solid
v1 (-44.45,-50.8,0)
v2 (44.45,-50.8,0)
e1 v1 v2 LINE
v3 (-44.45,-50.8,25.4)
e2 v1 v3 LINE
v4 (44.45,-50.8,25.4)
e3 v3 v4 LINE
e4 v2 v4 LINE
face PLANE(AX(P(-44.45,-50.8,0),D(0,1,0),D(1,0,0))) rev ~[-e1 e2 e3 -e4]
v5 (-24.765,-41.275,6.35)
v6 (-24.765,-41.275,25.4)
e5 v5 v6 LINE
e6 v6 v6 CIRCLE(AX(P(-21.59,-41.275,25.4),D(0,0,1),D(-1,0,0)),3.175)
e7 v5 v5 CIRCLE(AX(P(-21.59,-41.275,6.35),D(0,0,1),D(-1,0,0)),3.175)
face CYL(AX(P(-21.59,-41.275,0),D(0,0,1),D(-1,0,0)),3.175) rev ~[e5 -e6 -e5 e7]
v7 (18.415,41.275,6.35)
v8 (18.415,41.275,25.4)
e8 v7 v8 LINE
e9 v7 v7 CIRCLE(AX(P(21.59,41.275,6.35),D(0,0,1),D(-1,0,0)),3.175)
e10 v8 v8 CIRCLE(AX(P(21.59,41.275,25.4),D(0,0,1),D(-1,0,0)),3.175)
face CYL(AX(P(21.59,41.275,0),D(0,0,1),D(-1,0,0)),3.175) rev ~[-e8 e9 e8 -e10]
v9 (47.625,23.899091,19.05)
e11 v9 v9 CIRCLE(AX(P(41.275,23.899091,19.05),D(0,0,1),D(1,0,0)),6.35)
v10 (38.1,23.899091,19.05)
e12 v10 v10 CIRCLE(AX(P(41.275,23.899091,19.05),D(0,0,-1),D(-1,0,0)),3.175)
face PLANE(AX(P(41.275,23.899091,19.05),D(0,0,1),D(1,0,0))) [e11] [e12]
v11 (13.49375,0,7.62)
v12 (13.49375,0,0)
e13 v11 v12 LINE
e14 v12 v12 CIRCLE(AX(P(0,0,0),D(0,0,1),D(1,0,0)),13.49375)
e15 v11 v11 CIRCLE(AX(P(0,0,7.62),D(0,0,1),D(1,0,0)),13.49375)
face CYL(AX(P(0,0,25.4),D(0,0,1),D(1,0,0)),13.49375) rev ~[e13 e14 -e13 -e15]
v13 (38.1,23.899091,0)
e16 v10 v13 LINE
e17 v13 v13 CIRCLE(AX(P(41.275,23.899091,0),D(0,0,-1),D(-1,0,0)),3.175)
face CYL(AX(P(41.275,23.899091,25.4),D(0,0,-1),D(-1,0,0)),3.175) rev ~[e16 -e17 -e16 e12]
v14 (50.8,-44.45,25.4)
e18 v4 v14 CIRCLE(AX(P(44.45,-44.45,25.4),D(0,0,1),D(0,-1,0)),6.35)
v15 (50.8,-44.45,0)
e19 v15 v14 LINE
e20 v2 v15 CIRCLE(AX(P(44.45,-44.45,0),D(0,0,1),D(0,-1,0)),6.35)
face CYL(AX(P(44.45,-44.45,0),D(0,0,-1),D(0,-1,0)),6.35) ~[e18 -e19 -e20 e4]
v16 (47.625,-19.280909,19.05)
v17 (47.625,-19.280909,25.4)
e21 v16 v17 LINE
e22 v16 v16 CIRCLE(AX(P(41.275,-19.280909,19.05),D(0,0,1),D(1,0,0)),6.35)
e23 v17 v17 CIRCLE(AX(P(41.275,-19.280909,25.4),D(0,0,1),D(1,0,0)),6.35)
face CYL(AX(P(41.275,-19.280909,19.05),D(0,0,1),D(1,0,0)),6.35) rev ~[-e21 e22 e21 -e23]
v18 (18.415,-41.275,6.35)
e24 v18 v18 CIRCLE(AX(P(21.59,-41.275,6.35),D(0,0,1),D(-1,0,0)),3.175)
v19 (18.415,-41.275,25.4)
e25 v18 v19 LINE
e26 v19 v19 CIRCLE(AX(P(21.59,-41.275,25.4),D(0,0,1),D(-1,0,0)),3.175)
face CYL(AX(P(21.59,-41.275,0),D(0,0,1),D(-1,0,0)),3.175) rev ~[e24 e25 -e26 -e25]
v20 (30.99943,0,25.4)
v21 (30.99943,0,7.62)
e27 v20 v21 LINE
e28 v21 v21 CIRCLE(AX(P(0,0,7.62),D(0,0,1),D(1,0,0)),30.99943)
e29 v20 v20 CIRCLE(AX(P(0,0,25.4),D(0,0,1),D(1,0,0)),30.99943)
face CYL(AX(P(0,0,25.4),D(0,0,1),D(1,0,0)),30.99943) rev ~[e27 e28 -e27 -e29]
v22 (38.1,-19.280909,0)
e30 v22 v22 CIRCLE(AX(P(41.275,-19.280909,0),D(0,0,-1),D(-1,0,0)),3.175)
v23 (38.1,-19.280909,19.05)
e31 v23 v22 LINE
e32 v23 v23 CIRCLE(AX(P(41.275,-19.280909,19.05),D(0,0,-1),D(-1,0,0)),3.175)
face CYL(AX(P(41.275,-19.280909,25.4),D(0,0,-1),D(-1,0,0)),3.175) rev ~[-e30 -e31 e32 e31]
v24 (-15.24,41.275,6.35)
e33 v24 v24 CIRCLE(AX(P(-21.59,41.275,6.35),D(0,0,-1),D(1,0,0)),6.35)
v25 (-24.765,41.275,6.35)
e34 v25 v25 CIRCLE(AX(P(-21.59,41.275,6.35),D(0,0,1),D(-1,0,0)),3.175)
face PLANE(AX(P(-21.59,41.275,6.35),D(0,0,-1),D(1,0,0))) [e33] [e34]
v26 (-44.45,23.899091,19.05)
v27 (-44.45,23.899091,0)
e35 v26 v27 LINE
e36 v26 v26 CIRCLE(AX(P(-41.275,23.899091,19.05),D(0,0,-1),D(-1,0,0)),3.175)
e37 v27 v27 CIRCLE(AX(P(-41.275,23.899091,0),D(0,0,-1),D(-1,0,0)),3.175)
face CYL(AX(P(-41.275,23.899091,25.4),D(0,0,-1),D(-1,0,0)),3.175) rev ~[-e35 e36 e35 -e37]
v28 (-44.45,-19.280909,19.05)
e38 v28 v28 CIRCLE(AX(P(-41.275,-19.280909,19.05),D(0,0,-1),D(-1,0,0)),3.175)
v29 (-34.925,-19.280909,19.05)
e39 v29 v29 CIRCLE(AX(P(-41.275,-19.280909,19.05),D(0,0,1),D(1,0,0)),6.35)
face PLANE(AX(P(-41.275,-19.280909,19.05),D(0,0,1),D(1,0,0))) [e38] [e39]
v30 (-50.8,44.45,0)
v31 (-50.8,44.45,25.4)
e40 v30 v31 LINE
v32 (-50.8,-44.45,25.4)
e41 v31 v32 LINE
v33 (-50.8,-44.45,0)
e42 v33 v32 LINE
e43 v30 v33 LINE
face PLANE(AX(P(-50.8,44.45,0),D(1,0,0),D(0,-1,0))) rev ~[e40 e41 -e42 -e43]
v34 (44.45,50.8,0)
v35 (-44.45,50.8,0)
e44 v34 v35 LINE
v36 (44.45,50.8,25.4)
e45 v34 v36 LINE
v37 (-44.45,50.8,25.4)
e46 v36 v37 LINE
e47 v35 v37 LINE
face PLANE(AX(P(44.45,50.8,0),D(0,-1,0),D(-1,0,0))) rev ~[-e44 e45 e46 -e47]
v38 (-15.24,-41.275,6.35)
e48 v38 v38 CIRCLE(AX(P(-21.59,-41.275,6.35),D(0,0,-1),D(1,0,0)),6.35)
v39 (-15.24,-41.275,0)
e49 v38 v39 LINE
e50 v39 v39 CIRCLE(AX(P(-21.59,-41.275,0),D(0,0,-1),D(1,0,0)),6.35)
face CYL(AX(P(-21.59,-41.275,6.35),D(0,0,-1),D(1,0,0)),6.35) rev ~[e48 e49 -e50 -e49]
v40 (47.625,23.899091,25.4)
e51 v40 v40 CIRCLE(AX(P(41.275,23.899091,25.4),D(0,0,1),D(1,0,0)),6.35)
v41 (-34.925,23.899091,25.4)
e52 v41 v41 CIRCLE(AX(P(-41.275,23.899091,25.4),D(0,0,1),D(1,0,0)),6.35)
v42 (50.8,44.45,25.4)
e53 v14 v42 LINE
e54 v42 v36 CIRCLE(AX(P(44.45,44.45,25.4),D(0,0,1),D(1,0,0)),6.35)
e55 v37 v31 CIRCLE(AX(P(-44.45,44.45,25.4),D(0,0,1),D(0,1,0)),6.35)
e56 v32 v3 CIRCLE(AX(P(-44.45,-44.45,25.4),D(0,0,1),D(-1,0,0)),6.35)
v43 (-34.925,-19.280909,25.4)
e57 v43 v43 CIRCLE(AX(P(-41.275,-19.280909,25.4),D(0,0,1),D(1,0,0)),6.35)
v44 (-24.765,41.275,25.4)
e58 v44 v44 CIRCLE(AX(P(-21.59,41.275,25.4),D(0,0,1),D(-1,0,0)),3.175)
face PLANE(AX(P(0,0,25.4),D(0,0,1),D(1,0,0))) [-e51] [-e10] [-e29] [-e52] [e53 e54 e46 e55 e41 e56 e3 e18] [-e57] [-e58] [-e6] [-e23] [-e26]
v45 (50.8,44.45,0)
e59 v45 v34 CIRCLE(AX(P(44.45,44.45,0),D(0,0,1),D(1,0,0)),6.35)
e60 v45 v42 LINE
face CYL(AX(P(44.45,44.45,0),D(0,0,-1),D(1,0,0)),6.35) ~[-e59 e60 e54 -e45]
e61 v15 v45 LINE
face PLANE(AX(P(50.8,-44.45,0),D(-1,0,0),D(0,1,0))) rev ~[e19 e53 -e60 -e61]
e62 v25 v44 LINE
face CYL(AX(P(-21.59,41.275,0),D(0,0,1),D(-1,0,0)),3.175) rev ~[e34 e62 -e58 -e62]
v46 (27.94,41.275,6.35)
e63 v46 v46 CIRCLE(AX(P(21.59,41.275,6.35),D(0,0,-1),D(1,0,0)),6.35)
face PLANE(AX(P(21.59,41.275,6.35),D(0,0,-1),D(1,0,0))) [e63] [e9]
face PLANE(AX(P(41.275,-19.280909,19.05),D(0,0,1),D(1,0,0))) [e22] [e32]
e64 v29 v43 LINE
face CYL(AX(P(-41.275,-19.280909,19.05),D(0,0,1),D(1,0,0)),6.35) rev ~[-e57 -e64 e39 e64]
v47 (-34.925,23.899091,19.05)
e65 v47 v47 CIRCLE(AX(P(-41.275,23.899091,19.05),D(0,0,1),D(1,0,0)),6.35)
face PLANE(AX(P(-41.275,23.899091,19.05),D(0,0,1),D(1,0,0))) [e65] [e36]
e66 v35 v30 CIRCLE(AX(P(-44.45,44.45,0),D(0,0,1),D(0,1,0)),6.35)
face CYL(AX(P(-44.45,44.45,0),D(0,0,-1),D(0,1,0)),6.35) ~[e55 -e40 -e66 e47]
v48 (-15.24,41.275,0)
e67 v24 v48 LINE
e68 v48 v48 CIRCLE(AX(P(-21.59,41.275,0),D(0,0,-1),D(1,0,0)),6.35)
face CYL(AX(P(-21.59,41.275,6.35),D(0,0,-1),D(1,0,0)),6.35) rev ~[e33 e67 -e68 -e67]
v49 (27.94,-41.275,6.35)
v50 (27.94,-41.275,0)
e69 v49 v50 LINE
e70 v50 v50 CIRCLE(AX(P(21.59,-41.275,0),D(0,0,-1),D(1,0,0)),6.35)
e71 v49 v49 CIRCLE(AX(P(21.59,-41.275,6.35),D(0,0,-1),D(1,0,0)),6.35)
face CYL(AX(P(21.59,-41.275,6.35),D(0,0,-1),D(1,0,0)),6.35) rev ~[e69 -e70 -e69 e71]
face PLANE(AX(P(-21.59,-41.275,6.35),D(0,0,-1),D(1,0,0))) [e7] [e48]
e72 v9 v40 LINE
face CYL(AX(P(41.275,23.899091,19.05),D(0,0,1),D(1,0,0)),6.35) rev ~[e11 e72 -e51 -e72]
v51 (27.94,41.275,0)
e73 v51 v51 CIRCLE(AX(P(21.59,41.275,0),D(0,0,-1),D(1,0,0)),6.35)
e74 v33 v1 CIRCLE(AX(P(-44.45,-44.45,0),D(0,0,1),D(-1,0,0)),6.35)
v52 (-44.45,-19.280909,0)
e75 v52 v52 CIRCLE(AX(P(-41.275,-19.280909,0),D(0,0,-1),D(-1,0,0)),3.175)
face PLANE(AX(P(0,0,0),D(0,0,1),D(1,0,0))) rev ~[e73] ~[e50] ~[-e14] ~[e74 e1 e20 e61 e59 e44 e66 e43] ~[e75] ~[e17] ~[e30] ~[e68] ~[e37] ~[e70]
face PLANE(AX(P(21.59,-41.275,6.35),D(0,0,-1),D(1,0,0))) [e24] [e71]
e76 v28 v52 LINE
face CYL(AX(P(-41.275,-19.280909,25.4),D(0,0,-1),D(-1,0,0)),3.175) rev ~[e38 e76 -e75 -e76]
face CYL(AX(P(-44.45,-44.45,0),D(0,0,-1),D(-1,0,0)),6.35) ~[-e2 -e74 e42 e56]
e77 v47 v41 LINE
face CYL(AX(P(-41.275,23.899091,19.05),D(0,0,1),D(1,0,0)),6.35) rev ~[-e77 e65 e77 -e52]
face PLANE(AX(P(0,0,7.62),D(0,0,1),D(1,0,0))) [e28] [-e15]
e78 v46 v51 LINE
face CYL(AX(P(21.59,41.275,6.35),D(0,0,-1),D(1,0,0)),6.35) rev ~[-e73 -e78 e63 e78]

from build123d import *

# Parameters (mm, degrees)
F1_DEPTH        = 25.4
F2_R            = 13.49375
F3_DEPTH        = 25.4
F4_R            = 30.99943
F4_R_2          = 13.49375
F5_DEPTH        = 17.78
F6_R            = 31.0007
F6_R_2          = 12.50061
F7_DEPTH        = 16.99768
F8_DEPTH        = 16.99768
F11_D           = 6.35
F11_DEPTH       = 38.1
F11_CBORE_D     = 12.7
F11_CBORE_DEPTH = 6.35
F11_TIP         = 1.9077324654
F13_D           = 6.35
F13_DEPTH       = 38.1
F13_CBORE_D     = 12.7
F13_CBORE_DEPTH = 6.35
F13_TIP         = 1.9077324654


# Not quite as in the source:
# - a feature names something its author has since deleted; it is built from what else it names


with BuildPart() as f1:
    # F0 (on Top) → F1 (new body)
    with BuildSketch(Plane.XY):
        with BuildLine():
            ThreePointArc((-50.8, -44.45), (-48.9401280605, -48.9401280605), (-44.45, -50.8))
            Line((-44.45, -50.8), (-31.75, -50.8))
            Line((-31.75, -50.8), (31.75, -50.8))
            Line((31.75, -50.8), (44.45, -50.8))
            ThreePointArc((44.45, -50.8), (48.9401280605, -48.9401280605), (50.8, -44.45))
            Line((50.8, -44.45), (50.8, 44.45))
            ThreePointArc((50.8, 44.45), (48.9401280605, 48.9401280605), (44.45, 50.8))
            Line((44.45, 50.8), (-44.45, 50.8))
            ThreePointArc((-44.45, 50.8), (-48.9401280605, 48.9401280605), (-50.8, 44.45))
            Line((-50.8, 44.45), (-50.8, -44.45))
        make_face()
    extrude(amount=F1_DEPTH)

    # F2 (on face) → F3 (cut)
    with BuildSketch(Plane.XY.offset(25.4)):
        Circle(F2_R)
    extrude(amount=-F3_DEPTH, mode=Mode.SUBTRACT)

    # F4 (on face) → F5 (cut)
    with BuildSketch(Plane.XY.offset(25.4)):
        Circle(F4_R)
        Circle(F4_R_2, mode=Mode.SUBTRACT)
    extrude(amount=-F5_DEPTH, mode=Mode.SUBTRACT)

    # F11
    with Locations(Plane(origin=(0, 0, 0), x_dir=(1, 0, 0), z_dir=(0, 0, -1))):
        with Locations((-21.59, -41.275), (21.59, -41.275), (-21.59, 41.275), (21.59, 41.275)):
            CounterBoreHole(F11_D / 2, F11_CBORE_D / 2, F11_CBORE_DEPTH, depth=F11_DEPTH)
            with Locations((0, 0, -(F11_DEPTH + F11_TIP / 2))):  # 118° drill point
                Cone(0, F11_D / 2, F11_TIP, mode=Mode.SUBTRACT)

    # F13
    with Locations(Plane.XY.offset(25.4)):
        with Locations((-41.275, 23.8990909091), (-41.275, -19.2809090909), (41.275, 23.8990909091), (41.275, -19.2809090909)):
            CounterBoreHole(F13_D / 2, F13_CBORE_D / 2, F13_CBORE_DEPTH, depth=F13_DEPTH)
            with Locations((0, 0, -(F13_DEPTH + F13_TIP / 2))):  # 118° drill point
                Cone(0, F13_D / 2, F13_TIP, mode=Mode.SUBTRACT)


with BuildPart() as f7:
    # F6 (on Top) → F7 (new body)
    with BuildSketch(Plane.XY):
        with Locations((-113.8032615222, 0)):
            Circle(F6_R)
        with Locations((-113.8032615222, 0)):
            Circle(F6_R_2, mode=Mode.SUBTRACT)
    extrude(amount=F7_DEPTH)


with BuildPart() as f8:
    # F6 (on Top) → F8 (new body)
    with BuildSketch(Plane.XY):
        with Locations((-113.8032615222, 0)):
            Circle(F6_R)
        with Locations((-113.8032615222, 0)):
            Circle(F6_R_2, mode=Mode.SUBTRACT)
    extrude(amount=F8_DEPTH)


solid = f1.part
